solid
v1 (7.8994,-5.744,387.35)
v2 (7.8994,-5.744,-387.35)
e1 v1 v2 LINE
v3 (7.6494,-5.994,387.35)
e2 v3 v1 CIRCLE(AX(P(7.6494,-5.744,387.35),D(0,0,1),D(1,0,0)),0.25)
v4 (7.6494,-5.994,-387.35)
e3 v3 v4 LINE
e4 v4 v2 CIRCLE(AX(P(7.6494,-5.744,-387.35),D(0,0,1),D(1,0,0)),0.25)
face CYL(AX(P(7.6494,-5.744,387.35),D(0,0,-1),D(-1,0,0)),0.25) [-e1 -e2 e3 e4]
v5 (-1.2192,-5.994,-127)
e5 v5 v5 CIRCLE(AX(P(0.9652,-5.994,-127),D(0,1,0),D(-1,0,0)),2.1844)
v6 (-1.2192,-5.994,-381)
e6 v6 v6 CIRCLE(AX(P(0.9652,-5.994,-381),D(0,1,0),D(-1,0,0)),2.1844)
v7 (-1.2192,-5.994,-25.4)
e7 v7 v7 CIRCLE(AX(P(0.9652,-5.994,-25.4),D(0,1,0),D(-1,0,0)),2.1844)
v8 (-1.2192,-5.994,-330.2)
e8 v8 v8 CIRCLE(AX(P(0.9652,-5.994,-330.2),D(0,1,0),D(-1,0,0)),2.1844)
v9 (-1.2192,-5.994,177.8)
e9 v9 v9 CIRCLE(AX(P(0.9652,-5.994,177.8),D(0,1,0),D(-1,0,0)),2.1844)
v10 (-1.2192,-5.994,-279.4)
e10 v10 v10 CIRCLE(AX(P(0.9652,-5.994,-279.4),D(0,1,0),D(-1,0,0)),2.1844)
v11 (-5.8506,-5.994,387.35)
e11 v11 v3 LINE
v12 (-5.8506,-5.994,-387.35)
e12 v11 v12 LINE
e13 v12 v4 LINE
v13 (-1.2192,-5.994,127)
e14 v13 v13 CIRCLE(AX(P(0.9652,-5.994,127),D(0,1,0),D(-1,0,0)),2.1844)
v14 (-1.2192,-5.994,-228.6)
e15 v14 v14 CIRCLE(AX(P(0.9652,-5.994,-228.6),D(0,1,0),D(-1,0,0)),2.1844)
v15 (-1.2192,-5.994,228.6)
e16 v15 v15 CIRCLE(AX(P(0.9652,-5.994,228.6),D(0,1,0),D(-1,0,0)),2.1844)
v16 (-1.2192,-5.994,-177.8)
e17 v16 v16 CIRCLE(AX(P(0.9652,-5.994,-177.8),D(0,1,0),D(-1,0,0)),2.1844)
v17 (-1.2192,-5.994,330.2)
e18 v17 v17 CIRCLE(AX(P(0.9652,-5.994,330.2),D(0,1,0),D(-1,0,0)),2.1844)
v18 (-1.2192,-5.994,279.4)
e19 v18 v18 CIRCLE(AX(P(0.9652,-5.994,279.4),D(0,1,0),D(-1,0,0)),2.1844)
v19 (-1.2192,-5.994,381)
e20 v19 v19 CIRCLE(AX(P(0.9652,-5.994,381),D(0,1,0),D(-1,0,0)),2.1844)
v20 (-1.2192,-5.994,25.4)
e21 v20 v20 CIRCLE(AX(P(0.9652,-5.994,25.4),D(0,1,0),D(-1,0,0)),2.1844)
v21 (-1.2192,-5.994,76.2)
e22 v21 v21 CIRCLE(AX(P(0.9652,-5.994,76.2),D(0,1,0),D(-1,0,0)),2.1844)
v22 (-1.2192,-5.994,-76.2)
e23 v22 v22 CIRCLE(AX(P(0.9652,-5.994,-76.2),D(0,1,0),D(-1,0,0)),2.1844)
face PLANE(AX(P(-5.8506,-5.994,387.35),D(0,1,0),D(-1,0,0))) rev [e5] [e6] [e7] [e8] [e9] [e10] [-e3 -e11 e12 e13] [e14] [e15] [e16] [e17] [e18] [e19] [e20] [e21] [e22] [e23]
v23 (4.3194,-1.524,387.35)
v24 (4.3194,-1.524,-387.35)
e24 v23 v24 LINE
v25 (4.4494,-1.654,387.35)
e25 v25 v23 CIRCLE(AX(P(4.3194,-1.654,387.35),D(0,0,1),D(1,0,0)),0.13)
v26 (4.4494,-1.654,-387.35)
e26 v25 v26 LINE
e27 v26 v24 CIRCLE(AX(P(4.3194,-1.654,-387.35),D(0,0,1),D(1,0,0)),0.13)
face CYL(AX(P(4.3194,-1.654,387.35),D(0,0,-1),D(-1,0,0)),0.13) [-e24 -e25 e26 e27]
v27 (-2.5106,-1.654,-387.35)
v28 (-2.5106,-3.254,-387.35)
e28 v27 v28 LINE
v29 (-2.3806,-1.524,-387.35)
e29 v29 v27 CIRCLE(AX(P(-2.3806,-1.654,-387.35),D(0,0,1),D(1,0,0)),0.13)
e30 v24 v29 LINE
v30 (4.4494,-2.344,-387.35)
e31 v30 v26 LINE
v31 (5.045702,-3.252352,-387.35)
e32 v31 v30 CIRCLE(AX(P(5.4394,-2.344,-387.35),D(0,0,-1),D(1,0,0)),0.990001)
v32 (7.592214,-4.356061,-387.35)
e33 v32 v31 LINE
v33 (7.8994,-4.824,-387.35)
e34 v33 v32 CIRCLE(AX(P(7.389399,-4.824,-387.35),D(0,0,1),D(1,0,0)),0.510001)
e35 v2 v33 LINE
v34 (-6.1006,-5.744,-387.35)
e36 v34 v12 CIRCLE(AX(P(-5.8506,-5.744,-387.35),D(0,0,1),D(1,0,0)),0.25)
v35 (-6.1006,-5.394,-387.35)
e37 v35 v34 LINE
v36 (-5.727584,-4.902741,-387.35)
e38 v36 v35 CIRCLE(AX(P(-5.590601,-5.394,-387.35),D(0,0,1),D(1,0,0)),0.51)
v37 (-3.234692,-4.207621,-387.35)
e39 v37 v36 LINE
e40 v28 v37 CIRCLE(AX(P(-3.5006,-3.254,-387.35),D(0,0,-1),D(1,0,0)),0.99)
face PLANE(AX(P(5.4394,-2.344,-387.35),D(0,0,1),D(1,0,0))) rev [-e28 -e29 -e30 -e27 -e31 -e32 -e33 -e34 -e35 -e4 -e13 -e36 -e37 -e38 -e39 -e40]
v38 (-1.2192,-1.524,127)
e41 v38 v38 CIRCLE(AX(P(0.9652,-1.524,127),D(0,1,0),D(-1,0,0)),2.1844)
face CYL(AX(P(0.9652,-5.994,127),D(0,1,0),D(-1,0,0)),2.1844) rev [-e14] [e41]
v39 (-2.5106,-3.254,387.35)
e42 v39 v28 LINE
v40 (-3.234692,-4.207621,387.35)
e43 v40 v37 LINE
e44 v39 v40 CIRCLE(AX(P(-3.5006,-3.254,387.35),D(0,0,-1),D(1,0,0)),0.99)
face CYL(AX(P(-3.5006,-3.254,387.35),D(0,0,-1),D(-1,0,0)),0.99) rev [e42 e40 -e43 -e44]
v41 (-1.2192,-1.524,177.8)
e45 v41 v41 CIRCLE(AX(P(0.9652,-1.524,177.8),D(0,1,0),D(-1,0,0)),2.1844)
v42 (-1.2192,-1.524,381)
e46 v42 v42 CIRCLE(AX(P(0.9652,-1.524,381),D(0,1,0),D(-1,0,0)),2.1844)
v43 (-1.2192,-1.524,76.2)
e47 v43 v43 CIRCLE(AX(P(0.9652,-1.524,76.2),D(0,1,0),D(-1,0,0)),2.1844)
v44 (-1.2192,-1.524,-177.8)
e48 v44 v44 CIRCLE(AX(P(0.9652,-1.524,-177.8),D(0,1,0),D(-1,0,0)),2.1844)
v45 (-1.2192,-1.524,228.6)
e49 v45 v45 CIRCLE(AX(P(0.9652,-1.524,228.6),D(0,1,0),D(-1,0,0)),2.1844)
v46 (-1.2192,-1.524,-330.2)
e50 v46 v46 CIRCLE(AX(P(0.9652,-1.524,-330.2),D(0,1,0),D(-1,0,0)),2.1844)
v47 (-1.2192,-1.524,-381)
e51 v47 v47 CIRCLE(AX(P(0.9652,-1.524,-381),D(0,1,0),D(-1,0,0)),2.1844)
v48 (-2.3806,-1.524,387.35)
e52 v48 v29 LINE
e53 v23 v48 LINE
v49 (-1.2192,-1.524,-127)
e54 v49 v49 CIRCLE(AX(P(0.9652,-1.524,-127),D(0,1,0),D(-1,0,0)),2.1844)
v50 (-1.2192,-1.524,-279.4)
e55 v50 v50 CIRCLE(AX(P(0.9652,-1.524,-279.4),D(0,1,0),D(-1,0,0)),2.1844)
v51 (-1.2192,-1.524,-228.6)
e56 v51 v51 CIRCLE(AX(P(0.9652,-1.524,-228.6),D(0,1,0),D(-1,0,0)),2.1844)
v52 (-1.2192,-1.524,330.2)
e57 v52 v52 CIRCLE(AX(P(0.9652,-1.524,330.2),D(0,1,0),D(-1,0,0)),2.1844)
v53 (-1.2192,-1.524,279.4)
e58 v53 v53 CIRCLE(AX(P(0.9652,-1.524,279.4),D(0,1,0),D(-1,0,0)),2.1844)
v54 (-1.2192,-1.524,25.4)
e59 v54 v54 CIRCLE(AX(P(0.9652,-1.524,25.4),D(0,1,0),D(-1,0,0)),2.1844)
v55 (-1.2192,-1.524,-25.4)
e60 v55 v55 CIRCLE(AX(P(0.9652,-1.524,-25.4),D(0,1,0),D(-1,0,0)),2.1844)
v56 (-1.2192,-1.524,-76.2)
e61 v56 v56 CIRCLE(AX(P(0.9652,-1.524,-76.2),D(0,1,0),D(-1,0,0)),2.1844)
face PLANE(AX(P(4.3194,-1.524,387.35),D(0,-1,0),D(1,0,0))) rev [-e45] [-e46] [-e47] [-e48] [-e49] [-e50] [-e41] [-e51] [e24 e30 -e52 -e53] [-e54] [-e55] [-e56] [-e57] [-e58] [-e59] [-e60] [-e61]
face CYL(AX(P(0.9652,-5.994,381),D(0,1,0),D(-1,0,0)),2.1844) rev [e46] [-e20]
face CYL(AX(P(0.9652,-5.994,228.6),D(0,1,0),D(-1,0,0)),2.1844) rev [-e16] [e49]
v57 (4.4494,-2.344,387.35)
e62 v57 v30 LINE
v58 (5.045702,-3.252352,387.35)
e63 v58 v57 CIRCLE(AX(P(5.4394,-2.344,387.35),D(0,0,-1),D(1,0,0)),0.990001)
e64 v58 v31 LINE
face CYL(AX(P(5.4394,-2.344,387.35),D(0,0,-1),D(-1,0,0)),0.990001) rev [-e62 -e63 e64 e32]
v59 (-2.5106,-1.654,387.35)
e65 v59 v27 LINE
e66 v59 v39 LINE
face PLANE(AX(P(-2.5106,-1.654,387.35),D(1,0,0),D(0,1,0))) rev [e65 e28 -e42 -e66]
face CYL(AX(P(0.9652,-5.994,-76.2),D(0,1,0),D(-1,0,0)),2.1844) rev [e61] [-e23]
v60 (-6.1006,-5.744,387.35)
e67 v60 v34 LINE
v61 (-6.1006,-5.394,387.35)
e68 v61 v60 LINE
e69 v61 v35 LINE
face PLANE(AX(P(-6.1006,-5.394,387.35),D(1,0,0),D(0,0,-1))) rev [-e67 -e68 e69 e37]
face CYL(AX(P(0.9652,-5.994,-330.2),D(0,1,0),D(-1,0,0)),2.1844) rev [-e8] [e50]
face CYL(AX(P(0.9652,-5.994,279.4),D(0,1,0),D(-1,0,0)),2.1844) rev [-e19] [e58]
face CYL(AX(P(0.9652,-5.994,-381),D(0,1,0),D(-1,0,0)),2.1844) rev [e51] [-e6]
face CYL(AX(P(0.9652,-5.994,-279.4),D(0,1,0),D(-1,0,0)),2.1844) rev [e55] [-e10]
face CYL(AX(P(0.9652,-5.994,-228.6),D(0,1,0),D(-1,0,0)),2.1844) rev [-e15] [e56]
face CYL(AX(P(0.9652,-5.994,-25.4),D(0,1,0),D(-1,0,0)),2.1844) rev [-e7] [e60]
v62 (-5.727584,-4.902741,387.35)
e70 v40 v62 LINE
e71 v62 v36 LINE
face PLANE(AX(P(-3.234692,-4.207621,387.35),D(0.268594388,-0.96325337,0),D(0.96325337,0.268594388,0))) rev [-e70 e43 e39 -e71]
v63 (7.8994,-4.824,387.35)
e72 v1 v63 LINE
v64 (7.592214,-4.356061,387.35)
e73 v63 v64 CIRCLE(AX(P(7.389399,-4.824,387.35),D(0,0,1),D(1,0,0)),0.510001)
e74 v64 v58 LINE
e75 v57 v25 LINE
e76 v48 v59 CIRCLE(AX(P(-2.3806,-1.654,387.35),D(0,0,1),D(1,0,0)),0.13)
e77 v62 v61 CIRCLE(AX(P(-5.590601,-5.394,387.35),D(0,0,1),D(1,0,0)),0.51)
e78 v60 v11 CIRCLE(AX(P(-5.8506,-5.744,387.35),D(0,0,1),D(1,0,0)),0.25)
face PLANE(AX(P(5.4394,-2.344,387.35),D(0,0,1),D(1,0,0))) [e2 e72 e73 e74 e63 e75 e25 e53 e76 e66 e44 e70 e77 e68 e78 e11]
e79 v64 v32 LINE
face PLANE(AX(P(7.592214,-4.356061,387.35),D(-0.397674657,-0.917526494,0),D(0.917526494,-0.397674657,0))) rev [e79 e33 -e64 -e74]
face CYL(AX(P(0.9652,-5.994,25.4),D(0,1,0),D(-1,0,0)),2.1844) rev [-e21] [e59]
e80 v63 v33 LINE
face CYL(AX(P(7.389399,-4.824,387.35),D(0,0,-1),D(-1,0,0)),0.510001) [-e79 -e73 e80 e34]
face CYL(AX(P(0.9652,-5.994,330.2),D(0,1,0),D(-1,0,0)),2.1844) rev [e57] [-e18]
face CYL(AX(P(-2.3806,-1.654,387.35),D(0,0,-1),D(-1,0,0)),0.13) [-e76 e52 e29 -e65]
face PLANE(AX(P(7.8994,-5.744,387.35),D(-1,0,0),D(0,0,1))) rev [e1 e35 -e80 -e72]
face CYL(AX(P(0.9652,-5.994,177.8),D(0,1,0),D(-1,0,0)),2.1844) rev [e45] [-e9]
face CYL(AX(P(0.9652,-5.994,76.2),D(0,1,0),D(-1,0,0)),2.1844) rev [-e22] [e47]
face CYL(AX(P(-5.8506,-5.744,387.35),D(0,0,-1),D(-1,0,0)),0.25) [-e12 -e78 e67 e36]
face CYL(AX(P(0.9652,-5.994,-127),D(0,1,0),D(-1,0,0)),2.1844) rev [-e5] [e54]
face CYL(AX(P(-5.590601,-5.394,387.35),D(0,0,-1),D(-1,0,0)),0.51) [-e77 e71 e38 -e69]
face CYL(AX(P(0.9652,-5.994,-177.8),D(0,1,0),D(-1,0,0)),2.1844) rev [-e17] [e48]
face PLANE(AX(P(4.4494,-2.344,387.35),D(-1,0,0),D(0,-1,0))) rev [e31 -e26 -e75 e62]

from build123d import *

# Parameters (mm, degrees)
BOSS_EXTRUDE1_START = -387.35
BOSS_EXTRUDE1_DEPTH = 774.7
SKETCH2_R           = 2.1844
CUT_EXTRUDE1_DEPTH  = 388.45632518
LPATTERN1_COUNT     = 16
LPATTERN1_PITCH     = 50.8


# Read off the part's stored shape, not the designer's step: Boss-Extrude1
with BuildPart() as part:
    # Boss-Extrude1 outline → Boss-Extrude1 (new body)
    with BuildSketch(Plane.XY.offset(BOSS_EXTRUDE1_START)):
        with BuildLine():
            Line((7.592213731, -4.356061452), (5.045702304, -3.252351569))
            ThreePointArc((5.045702304, -3.252351569), (4.611794645, -2.88729515), (4.449399788, -2.34399969))
            Line((4.449399788, -2.34399969), (4.449399788, -1.654000019))
            ThreePointArc((4.449399788, -1.654000019), (4.411323664, -1.562076124), (4.319399769, -1.524))
            Line((4.319399769, -1.524), (-2.380600243, -1.524))
            ThreePointArc((-2.380600243, -1.524), (-2.472524138, -1.562076124), (-2.510600262, -1.654000019))
            Line((-2.510600262, -1.654000019), (-2.510600262, -3.254000076))
            ThreePointArc((-2.510600262, -3.254000076), (-2.712136776, -3.852686425), (-3.234691843, -4.207620945))
            Line((-3.234691843, -4.207620945), (-5.727583947, -4.902741098))
            ThreePointArc((-5.727583947, -4.902741098), (-5.996778712, -5.08558597), (-6.100600448, -5.393999841))
            Line((-6.100600448, -5.393999841), (-6.100600448, -5.743999967))
            ThreePointArc((-6.100600448, -5.743999967), (-6.027377074, -5.92077683), (-5.850600211, -5.994000204))
            Line((-5.850600211, -5.994000204), (7.649399763, -5.994000204))
            ThreePointArc((7.649399763, -5.994000204), (7.826176626, -5.92077683), (7.8994, -5.743999967))
            Line((7.8994, -5.743999967), (7.8994, -4.824000488))
            ThreePointArc((7.8994, -4.824000488), (7.81574201, -4.544120895), (7.592213731, -4.356061452))
        make_face()
    extrude(amount=BOSS_EXTRUDE1_DEPTH)

    # Sketch2 → Cut-Extrude1 (cut, through all)
    with BuildSketch(Plane(origin=(0, -1.524, 0), x_dir=(1, 0, 0), z_dir=(0, 1, 0))):
        with Locations(Location((0.9652, -381, 0), (0, 0, 180))):
            Circle(SKETCH2_R)
    cut_extrude1 = extrude(amount=-CUT_EXTRUDE1_DEPTH, mode=Mode.SUBTRACT)

    # LPattern1: Cut-Extrude1 ×16
    with Locations(*[(0, 0, -i * LPATTERN1_PITCH) for i in range(1, LPATTERN1_COUNT)]):
        add(cut_extrude1, mode=Mode.SUBTRACT)


solid = part.part
